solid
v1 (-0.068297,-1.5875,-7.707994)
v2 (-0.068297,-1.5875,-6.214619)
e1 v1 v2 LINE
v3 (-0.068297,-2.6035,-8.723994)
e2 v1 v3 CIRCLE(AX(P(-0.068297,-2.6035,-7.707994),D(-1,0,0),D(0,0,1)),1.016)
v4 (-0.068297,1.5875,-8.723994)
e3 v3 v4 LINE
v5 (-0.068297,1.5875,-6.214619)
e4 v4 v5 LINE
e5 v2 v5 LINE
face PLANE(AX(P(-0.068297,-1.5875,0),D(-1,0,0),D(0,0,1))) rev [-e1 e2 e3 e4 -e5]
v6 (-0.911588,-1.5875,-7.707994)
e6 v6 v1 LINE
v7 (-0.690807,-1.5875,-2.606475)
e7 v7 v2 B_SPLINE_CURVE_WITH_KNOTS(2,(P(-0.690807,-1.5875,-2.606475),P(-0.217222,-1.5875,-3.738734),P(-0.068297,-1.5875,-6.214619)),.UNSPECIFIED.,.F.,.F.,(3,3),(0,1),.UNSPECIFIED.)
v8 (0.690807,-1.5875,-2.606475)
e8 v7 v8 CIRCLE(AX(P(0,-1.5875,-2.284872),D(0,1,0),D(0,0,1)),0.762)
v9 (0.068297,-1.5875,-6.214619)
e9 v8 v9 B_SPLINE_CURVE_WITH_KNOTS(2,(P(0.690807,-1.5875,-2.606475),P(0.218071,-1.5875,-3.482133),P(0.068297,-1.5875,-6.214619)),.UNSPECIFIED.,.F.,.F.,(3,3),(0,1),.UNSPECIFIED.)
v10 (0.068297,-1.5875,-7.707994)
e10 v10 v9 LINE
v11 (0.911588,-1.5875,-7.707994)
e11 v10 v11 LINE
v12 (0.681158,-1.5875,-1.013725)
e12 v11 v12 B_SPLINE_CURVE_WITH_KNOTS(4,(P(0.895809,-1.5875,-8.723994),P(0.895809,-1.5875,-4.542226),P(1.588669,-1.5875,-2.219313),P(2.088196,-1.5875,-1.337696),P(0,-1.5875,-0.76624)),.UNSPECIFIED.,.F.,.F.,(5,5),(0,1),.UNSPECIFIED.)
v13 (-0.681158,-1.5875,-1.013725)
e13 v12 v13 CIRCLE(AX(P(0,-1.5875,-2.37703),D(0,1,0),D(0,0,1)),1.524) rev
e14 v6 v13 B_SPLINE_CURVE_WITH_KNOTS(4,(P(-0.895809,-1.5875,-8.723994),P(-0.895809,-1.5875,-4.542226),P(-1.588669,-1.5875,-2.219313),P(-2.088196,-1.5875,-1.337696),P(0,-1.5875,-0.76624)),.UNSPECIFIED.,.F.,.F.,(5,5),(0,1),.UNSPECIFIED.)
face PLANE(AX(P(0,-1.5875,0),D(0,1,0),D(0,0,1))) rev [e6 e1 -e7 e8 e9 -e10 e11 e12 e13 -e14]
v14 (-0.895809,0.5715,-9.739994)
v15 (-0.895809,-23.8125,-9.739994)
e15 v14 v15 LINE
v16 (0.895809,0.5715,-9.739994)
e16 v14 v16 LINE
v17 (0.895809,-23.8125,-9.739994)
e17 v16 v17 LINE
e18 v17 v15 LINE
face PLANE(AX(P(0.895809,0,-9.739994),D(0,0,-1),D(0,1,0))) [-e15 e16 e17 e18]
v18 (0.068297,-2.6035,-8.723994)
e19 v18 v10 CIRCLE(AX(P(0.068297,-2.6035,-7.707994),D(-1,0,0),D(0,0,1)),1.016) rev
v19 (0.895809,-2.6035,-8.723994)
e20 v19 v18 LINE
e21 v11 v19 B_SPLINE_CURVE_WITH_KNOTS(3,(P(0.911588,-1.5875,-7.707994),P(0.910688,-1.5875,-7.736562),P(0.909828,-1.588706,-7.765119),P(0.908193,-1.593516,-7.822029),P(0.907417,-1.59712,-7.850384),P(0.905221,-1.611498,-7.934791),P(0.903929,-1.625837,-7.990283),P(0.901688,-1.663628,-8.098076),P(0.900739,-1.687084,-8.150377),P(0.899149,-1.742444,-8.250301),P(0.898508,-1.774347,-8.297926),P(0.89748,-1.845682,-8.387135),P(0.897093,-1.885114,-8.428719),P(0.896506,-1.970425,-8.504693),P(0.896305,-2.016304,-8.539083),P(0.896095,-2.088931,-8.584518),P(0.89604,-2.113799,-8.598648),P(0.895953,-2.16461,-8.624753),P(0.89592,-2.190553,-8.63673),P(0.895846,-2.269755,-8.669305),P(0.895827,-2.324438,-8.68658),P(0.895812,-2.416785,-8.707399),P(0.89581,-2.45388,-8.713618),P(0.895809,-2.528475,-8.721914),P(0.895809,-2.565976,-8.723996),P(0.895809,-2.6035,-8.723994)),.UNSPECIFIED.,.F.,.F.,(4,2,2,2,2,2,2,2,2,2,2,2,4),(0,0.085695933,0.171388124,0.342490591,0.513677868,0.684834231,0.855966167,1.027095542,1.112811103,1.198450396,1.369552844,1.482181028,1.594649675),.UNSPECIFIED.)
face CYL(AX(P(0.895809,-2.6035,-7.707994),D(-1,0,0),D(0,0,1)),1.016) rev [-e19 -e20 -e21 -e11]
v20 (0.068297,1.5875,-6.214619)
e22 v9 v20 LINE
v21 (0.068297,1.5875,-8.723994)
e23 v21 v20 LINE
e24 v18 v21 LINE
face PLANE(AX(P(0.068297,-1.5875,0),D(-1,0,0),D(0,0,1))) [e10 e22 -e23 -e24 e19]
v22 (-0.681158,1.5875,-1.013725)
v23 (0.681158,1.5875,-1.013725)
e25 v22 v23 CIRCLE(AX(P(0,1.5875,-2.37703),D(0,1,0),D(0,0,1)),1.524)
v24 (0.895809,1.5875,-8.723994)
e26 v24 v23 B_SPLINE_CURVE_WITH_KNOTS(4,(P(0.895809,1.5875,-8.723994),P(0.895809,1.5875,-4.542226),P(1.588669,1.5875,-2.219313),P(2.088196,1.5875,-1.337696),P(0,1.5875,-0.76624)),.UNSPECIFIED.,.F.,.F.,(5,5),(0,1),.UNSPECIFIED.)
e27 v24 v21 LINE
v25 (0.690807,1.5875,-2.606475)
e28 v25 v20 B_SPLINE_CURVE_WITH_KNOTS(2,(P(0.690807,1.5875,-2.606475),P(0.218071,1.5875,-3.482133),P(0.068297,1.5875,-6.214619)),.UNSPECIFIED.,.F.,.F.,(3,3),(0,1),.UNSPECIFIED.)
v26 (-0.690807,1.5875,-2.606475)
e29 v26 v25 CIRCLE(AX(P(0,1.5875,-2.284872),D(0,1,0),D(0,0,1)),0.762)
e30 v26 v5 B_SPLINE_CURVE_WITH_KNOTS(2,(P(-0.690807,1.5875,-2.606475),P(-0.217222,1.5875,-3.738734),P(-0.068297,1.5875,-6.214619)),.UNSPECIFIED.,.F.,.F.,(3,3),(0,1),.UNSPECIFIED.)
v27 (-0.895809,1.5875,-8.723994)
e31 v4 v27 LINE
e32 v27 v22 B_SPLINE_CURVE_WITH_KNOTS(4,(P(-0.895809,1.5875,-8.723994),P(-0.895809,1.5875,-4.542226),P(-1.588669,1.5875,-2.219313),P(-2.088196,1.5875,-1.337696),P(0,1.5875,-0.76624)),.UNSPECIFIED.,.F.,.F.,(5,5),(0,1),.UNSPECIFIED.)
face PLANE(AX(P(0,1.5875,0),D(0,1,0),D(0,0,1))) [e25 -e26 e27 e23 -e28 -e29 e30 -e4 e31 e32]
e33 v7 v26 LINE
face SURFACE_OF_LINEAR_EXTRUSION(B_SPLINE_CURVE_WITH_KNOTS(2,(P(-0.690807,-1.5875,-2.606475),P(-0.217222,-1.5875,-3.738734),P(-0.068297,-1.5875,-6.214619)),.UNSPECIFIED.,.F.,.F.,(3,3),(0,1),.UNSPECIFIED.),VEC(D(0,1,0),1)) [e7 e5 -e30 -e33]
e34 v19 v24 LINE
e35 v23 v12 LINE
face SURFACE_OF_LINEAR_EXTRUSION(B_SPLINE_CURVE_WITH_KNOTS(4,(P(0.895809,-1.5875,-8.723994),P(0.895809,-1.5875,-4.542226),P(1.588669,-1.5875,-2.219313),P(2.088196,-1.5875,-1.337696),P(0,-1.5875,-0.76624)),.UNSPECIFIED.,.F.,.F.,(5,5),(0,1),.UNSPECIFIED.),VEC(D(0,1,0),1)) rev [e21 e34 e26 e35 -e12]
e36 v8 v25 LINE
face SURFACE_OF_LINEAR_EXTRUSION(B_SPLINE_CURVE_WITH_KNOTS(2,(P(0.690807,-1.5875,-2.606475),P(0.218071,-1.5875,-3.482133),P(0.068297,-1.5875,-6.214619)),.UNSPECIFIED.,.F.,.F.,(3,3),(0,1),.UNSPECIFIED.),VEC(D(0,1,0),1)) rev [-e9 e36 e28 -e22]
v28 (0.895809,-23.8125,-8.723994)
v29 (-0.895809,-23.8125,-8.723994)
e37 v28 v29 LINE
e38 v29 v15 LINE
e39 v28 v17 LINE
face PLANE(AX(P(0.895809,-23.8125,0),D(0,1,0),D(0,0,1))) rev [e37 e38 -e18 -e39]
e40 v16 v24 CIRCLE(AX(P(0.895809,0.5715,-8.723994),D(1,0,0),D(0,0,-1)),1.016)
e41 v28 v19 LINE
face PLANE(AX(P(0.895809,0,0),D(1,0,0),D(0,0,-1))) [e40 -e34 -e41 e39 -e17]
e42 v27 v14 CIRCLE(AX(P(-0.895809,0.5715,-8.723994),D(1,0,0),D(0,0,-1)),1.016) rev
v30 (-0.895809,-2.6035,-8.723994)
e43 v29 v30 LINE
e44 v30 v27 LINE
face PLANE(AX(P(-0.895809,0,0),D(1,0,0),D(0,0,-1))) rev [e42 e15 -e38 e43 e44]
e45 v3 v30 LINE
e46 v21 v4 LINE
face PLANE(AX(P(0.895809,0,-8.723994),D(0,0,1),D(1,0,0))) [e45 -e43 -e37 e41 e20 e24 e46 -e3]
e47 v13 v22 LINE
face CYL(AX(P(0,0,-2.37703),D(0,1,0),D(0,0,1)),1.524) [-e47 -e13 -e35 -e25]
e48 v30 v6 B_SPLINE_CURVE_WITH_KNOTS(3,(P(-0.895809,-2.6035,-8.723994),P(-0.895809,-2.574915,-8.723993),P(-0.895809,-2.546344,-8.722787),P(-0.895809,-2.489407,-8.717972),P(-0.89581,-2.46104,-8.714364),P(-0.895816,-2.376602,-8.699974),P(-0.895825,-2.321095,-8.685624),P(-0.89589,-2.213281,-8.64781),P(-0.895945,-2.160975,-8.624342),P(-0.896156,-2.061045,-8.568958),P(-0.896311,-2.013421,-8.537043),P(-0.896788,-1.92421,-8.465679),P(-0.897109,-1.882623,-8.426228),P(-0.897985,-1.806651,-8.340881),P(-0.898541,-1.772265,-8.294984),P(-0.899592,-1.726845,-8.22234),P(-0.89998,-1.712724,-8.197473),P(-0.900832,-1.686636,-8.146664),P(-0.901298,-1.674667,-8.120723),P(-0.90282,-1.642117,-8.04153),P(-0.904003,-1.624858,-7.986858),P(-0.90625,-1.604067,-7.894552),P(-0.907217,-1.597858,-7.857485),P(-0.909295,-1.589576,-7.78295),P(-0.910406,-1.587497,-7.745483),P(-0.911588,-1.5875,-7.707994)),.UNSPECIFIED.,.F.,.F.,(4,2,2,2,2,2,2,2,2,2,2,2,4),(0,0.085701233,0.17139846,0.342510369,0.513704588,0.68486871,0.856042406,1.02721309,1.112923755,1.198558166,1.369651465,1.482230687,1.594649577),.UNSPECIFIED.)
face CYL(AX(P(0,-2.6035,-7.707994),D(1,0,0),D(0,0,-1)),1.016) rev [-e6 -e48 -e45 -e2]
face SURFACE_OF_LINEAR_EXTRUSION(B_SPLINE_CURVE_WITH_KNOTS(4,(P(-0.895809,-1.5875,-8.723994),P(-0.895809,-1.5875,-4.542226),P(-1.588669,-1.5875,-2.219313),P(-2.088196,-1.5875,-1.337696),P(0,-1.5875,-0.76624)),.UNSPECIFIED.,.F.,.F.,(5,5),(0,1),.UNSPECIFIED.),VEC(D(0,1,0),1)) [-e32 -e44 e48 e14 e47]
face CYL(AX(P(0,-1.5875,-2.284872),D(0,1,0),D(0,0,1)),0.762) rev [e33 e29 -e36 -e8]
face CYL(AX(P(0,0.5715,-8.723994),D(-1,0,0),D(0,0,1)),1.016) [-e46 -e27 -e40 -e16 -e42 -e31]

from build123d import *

# Parameters (mm, degrees)
BOSS_EXTRUDE1_DEPTH      = 1.5875
BOSS_EXTRUDE1_DEPTH_BACK = 1.5875
FILLET1_R                = 1.524
BOSS_EXTRUDE2_DEPTH      = 0.89581
BOSS_EXTRUDE2_DEPTH_BACK = 0.89581
FILLET2_R                = 1.016


with BuildPart() as part:
    # Sketch1 → Boss-Extrude1 (new, two sides: drawn at the far end of the back side and taken through both)
    with BuildSketch(Plane(origin=(0, 0, 0), x_dir=(1, 0, 0), z_dir=(0, 1, 0)).offset(-BOSS_EXTRUDE1_DEPTH_BACK)):
        with BuildLine():
            Line((-0.068296764, 6.214618695), (-0.068296764, 8.723993601))
            Line((-0.068296764, 8.723993601), (-0.895808533, 8.723993601))
            add(Edge.make_bspline(
                [(-0.895808533, 8.723993601), (-0.895808533, 4.54222596), (-1.588668774, 2.219313027), (-2.088196173, 1.337696034), (0, 0.766240154)],
                knots=[0, 0, 0, 0, 0, 1, 1, 1, 1, 1], degree=4))
            add(Edge.make_bspline(
                [(0.895808533, 8.723993601), (0.895808533, 4.54222596), (1.588668774, 2.219313027), (2.088196173, 1.337696034), (0, 0.766240154)],
                knots=[0, 0, 0, 0, 0, 1, 1, 1, 1, 1], degree=4))
            Line((0.895808533, 8.723993601), (0.068296764, 8.723993601))
            Line((0.068296764, 8.723993601), (0.068296764, 6.214618695))
            add(Edge.make_bspline(
                [(0.690807422, 2.606475487), (0.218071276, 3.482132924), (0.068296764, 6.214618695)],
                knots=[0, 0, 0, 1, 1, 1], degree=2))
            ThreePointArc((0.690807422, 2.606475487), (0, 1.52287153), (-0.690807422, 2.606475487))
            add(Edge.make_bspline(
                [(-0.690807422, 2.606475487), (-0.217222133, 3.738734236), (-0.068296764, 6.214618695)],
                knots=[0, 0, 0, 1, 1, 1], degree=2))
        make_face()
    extrude(amount=BOSS_EXTRUDE1_DEPTH + BOSS_EXTRUDE1_DEPTH_BACK)

    # Fillet1
    fillet1_edges = [part.edges().sort_by_distance(p)[0] for p in [
        (0, -0.79375, -0.766240154),
    ]]
    fillet(fillet1_edges, radius=FILLET1_R)

    # Sketch2 → Boss-Extrude2 (add, two sides: drawn at the far end of the back side and taken through both)
    with BuildSketch(Plane(origin=(0, 0, 0), x_dir=(0, 0, -1), z_dir=(1, 0, 0)).offset(-BOSS_EXTRUDE2_DEPTH_BACK)):
        Polygon((8.723993601, 1.5875), (8.723993601, -1.5875), (8.723993601, -23.8125), (9.739993601, -23.8125), (9.739993601, 1.5875), align=None)
    extrude(amount=BOSS_EXTRUDE2_DEPTH + BOSS_EXTRUDE2_DEPTH_BACK)

    # Fillet2
    fillet2_edges = [part.edges().sort_by_distance(p)[0] for p in [
        (0, 1.5875, -9.739993601),
        (0.482052648, -1.5875, -8.723993601),
        (-0.482052648, -1.5875, -8.723993601),
    ]]
    fillet(fillet2_edges, radius=FILLET2_R - 0.0001)  # a hair under: the kernel refuses the full size


solid = part.part
